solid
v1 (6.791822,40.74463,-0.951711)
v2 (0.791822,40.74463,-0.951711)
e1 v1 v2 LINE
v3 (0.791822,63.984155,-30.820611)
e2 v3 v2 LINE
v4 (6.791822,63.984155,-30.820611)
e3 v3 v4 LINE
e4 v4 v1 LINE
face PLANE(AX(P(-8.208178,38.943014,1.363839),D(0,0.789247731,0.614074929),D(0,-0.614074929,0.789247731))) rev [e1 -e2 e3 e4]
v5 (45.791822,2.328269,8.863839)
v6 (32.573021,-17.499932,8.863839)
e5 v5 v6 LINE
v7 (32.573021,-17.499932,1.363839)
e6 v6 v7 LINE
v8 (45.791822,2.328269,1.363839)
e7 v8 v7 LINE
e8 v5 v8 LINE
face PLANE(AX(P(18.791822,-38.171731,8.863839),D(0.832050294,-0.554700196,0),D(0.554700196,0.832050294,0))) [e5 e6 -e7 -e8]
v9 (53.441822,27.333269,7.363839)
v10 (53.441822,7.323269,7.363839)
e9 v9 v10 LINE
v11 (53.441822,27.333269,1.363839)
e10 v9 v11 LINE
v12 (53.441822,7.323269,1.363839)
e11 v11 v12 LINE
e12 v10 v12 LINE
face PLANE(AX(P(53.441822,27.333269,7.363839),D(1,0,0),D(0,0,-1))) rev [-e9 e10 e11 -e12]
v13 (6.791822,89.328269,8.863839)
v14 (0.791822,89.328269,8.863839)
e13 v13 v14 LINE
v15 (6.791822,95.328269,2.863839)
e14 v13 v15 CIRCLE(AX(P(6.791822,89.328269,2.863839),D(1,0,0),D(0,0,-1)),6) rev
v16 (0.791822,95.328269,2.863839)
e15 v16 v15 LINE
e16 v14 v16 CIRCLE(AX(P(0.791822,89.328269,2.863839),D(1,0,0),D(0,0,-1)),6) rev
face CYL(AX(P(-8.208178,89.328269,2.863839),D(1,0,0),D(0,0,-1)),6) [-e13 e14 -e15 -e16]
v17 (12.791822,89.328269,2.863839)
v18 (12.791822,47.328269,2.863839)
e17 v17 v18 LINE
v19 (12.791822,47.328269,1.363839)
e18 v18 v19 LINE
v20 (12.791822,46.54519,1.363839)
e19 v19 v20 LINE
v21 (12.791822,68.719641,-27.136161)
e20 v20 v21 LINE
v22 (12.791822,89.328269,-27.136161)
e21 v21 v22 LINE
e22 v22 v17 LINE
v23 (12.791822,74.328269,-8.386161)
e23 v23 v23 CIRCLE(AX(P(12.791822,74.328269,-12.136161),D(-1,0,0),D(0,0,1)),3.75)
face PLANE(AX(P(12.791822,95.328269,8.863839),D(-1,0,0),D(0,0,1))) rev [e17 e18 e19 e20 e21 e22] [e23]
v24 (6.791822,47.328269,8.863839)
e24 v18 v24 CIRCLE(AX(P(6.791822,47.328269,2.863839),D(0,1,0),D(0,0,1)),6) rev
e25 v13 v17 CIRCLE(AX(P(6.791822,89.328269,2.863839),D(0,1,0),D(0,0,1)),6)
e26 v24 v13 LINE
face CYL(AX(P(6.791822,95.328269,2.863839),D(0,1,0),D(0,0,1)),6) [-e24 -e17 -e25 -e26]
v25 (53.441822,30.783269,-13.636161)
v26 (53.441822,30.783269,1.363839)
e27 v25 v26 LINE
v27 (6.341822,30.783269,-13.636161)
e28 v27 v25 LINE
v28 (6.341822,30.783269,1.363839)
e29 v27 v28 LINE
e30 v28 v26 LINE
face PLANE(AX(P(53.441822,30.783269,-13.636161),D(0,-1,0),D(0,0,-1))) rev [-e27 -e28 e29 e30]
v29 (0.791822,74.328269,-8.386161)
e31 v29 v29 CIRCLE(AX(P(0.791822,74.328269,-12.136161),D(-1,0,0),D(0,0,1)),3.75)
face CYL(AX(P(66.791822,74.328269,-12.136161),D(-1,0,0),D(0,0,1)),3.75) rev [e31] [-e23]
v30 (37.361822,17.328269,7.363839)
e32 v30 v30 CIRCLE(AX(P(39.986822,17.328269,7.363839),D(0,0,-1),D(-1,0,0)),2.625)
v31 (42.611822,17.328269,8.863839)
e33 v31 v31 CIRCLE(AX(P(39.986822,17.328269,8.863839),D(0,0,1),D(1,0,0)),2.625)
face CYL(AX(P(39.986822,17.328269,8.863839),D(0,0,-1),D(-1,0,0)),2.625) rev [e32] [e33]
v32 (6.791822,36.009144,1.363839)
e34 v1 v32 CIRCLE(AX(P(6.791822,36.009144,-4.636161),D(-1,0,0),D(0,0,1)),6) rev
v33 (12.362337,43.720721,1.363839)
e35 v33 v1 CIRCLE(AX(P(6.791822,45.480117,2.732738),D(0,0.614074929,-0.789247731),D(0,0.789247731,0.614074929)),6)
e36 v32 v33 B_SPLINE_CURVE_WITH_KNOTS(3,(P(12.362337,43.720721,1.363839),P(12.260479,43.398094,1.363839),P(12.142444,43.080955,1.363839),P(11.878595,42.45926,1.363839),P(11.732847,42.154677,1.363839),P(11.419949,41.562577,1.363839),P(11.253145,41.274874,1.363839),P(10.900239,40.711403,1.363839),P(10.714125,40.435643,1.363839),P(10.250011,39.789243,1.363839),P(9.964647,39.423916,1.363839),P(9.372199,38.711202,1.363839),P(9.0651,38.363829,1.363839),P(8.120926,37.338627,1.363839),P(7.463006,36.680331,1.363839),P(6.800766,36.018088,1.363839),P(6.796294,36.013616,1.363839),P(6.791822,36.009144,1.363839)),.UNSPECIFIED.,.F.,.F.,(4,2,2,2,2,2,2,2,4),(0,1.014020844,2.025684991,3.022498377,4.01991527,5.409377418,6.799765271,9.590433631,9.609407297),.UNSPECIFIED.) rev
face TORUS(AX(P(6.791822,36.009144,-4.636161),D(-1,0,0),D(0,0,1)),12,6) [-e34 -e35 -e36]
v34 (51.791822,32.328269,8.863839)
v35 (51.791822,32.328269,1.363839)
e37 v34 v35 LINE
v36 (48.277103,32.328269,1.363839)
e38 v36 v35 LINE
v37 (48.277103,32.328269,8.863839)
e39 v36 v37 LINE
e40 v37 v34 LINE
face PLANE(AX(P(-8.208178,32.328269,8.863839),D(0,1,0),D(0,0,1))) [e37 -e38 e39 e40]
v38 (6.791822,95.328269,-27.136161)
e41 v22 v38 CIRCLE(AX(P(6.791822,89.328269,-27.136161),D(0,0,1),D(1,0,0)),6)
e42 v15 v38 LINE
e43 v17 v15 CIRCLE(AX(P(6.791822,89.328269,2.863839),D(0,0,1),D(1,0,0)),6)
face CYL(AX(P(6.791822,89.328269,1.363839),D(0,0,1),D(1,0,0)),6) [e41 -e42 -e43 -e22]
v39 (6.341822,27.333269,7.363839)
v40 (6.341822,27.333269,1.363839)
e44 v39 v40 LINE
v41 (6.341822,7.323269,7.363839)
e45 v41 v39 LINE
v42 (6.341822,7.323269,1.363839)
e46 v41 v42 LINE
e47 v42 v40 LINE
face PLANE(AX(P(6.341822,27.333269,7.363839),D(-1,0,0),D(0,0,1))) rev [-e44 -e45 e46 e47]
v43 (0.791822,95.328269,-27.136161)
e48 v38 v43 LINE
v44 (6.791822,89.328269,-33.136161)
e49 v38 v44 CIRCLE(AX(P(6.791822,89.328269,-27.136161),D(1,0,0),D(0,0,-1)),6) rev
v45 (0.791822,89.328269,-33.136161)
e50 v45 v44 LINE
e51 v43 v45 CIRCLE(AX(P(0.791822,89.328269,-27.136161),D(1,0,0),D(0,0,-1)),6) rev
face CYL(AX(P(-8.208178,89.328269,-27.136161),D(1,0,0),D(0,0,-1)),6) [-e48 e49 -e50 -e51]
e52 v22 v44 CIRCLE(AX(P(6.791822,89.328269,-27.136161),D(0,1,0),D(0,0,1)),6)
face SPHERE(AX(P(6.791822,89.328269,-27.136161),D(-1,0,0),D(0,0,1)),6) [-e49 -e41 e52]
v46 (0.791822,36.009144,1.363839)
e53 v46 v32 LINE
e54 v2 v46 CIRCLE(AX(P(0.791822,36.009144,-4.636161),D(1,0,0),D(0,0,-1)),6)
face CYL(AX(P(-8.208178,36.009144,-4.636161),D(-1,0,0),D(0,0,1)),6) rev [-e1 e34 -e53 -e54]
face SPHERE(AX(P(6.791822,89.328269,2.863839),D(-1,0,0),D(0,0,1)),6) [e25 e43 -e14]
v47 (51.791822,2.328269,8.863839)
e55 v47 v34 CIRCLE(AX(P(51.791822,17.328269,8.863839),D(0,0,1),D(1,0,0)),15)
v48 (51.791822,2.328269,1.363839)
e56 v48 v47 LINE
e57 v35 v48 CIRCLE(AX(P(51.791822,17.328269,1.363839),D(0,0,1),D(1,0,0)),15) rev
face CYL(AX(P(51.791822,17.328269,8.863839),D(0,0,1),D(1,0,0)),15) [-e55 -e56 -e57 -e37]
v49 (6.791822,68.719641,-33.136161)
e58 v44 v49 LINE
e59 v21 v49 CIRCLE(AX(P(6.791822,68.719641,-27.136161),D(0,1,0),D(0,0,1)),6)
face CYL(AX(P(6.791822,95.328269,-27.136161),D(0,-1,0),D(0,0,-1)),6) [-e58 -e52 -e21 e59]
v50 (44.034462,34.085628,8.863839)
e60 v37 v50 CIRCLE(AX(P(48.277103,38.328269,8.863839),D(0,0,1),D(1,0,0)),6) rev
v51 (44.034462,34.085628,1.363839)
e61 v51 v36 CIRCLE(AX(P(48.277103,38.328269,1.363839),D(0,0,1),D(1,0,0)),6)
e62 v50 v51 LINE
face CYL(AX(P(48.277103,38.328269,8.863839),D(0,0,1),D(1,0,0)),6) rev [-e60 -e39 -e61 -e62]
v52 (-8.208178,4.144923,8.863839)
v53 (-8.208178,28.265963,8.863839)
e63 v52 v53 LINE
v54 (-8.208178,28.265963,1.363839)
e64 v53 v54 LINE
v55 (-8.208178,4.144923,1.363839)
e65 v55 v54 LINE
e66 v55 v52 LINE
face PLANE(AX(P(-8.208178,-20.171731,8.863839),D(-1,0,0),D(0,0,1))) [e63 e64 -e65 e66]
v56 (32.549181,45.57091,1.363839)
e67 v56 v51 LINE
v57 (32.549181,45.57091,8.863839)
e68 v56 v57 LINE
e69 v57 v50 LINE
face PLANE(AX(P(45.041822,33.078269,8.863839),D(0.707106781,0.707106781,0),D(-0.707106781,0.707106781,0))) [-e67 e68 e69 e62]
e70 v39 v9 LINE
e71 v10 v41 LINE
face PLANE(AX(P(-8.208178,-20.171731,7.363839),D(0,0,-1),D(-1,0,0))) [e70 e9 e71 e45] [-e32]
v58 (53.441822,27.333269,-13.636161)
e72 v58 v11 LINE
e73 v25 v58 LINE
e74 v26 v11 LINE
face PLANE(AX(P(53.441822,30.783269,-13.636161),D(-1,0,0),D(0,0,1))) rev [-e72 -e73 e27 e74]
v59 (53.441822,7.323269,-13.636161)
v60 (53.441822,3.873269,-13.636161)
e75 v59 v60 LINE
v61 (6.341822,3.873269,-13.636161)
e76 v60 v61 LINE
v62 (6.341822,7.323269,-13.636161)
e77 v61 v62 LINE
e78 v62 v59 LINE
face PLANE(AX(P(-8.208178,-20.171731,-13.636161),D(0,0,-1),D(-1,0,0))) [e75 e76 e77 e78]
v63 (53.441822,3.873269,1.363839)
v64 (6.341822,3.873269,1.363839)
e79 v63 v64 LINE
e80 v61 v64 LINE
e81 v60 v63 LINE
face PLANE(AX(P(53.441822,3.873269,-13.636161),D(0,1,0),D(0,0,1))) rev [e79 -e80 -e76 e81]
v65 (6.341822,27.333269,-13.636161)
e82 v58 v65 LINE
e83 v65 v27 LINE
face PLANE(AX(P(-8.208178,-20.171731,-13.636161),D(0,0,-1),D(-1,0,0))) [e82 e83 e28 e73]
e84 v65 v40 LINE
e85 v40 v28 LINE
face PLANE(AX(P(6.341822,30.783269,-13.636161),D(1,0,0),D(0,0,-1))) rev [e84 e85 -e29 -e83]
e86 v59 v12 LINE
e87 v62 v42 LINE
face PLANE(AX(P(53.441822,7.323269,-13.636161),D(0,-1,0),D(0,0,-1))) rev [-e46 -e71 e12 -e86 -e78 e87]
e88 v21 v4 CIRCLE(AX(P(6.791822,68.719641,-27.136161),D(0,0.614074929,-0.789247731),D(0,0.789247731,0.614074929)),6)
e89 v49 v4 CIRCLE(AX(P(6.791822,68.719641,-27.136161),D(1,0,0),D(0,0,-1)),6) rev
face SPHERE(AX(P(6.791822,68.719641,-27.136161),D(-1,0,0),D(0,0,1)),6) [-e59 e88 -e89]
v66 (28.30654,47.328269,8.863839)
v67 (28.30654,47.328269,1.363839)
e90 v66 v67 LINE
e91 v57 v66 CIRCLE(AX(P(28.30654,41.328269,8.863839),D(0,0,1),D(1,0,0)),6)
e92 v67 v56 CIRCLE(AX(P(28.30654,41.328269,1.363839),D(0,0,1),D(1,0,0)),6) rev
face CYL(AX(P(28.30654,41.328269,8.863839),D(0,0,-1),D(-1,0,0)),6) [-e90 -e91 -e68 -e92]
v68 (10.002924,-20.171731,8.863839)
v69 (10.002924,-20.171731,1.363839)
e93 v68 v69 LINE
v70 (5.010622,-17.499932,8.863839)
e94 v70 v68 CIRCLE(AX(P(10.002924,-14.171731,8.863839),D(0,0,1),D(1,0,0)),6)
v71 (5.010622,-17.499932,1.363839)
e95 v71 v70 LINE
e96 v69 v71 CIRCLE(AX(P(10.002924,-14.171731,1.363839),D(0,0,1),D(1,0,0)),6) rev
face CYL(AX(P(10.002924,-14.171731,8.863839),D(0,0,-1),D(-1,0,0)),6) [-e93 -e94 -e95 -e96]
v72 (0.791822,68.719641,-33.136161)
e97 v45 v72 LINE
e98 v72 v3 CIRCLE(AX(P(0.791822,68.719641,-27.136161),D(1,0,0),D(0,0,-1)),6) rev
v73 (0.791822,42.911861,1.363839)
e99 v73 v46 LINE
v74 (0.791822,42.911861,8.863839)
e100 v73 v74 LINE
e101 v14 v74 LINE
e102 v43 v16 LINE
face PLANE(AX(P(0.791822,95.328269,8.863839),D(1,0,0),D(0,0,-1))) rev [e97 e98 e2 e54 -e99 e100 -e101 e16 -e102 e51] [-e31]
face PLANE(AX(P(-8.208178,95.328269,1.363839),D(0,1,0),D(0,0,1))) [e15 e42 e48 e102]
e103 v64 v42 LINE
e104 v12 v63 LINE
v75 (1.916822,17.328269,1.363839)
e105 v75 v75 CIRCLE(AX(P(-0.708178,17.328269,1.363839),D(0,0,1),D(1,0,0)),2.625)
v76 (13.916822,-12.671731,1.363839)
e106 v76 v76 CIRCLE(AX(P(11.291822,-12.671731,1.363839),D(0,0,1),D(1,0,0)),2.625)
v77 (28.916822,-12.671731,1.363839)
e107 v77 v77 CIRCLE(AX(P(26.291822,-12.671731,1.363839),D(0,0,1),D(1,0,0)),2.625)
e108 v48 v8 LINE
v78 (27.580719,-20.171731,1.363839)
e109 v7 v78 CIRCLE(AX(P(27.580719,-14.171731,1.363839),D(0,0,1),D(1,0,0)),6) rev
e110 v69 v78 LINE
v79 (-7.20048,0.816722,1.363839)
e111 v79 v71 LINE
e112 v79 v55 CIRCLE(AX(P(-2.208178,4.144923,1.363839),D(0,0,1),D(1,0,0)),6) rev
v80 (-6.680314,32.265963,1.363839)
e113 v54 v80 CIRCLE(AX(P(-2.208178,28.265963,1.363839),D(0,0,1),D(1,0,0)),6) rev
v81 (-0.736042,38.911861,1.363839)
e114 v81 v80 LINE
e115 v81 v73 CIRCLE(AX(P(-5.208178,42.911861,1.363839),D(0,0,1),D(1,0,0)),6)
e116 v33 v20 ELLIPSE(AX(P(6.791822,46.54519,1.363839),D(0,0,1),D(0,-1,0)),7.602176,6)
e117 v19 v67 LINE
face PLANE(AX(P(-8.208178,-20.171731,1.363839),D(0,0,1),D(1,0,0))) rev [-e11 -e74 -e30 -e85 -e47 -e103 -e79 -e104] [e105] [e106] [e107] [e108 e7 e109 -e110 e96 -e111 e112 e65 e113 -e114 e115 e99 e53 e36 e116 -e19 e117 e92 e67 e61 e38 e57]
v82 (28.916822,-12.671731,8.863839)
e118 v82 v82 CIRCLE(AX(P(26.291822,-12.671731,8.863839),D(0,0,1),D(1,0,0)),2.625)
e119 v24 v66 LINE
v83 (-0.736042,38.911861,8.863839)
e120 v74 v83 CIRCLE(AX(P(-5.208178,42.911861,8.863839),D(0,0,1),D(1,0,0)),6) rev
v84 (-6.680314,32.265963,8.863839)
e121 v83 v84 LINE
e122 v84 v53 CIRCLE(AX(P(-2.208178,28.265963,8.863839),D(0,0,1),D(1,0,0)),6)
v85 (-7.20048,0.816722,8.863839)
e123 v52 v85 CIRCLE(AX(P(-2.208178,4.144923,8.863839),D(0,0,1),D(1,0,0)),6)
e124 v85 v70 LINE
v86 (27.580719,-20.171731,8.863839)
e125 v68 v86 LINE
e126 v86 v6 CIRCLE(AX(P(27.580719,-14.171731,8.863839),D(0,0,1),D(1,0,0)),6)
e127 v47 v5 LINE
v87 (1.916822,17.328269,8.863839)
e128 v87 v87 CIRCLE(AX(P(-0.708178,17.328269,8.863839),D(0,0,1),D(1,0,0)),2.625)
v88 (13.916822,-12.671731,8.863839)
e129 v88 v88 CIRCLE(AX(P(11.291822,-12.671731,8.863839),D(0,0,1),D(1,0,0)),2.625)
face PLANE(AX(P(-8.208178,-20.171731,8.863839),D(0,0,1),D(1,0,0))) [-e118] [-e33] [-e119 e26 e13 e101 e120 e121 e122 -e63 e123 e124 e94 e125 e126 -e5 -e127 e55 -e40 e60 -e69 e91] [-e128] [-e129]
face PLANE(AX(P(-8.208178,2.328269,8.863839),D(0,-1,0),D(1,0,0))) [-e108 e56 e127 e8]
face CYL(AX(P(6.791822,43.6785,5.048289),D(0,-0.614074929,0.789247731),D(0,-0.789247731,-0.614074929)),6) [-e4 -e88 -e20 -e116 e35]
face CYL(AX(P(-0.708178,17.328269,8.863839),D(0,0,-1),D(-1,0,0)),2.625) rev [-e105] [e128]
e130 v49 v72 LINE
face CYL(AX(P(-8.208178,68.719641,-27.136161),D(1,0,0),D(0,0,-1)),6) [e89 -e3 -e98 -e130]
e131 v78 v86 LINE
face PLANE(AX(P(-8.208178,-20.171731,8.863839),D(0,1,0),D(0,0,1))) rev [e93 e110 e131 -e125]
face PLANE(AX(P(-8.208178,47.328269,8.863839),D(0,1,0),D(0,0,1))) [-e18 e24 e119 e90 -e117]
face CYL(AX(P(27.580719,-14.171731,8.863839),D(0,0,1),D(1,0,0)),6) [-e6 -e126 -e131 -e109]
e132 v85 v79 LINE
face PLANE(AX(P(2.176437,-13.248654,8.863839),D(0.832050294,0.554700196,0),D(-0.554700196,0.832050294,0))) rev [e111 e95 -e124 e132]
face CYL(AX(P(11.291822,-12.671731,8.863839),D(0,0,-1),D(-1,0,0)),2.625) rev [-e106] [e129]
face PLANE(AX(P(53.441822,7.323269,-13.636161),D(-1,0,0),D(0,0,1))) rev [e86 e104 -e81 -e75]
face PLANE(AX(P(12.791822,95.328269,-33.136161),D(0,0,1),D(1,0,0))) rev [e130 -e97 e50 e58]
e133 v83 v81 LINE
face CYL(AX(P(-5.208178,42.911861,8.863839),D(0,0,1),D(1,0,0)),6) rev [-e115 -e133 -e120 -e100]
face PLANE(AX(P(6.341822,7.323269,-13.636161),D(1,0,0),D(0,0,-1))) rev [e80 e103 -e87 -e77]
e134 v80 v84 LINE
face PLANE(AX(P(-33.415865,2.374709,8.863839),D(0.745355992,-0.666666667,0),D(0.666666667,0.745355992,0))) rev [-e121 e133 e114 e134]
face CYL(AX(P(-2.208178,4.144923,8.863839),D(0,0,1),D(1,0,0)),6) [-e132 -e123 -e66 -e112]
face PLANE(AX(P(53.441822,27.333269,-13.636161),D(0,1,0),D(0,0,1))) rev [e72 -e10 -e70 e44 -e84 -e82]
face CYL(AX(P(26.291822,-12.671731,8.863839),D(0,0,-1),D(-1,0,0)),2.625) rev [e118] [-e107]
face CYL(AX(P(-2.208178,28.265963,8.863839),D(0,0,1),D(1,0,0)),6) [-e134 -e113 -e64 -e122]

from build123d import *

# Parameters (mm, degrees)
SKETCH2_R           = 1.7500000000000018
SKETCH2_R_2         = 1.7499999999999967
SKETCH2_R_3         = 1.7500000000000013
SKETCH2_R_4         = 1.7500000000000038
BOSS_EXTRUDE2_DEPTH = 5
SKETCH5_W           = 31.39999999999999
SKETCH5_H           = 2.3000000000000007
BOSS_EXTRUDE4_DEPTH = 10
CUT_EXTRUDE1_DEPTH  = 77.48529270389177
FILLET1_RADIUS      = 10
FILLET1_LENGTH      = 5
SKETCH7_W           = 31.39999999999999
SKETCH7_H           = 13.340000000000003
CUT_EXTRUDE3_DEPTH  = 4
SKETCH8_W           = 8
SKETCH8_H           = 28
BOSS_EXTRUDE5_DEPTH = 32
BOSS_EXTRUDE6_DEPTH = 8
SKETCH10_R          = 2.500000000000001
CUT_EXTRUDE4_DEPTH  = 92.61877536837086
CUT_EXTRUDE5_DEPTH  = 89.05679985100527
FILLET3_R           = 4
FILLET2_R           = 4
FILLET4_R           = 4
SCALE1_SCALE        = 1.5


with BuildPart() as part:
    # Sketch2 → Boss-Extrude2 (new body)
    with BuildSketch(Plane.XY):
        Polygon((25.999999999999996, 45), (9.999999999999998, 45), (0, 33.819660112501055), (0, 15.000000000000002), (10.000000000000002, 0), (26, 0), (36.00000000000001, 14.999999999999993), (60, 14.999999999999996), (60, 35), (36.00000000000001, 35), align=None)
        with Locations((12.999999999999998, 5.000000000000004)):
            Circle(SKETCH2_R, mode=Mode.SUBTRACT)
        with Locations((22.999999999999993, 5.000000000000004)):
            Circle(SKETCH2_R_2, mode=Mode.SUBTRACT)
        with Locations((5.000000000000001, 24.999999999999993)):
            Circle(SKETCH2_R_3, mode=Mode.SUBTRACT)
        with Locations((32.129999999999995, 24.999999999999993)):
            Circle(SKETCH2_R_4, mode=Mode.SUBTRACT)
    extrude(amount=BOSS_EXTRUDE2_DEPTH)

    # Sketch5 → Boss-Extrude4 (add)
    with BuildSketch(Plane(origin=(0, 0, 0), x_dir=(-1, 0, 0), z_dir=(0, 0, -1))):
        with Locations((-25.4, 17.179999999999993)):
            Rectangle(SKETCH5_W, SKETCH5_H)
        with Locations((-25.4, 32.82)):
            Rectangle(SKETCH5_W, SKETCH5_H)
    extrude(amount=BOSS_EXTRUDE4_DEPTH)

    # Sketch6 → Cut-Extrude1 (cut, through all)
    with BuildSketch(Plane.XY.offset(5)):
        Polygon((60, 35), (49.999999999999986, 35), (49.99999999999999, 14.999999999999993), (60, 14.999999999999993), align=None)
    extrude(amount=-CUT_EXTRUDE1_DEPTH, mode=Mode.SUBTRACT)

    # Fillet1: full round fillet: the end face becomes a half cylinder, R = half its width
    fillet1_face = Plane((50, 25, 2.5), x_dir=(0, 0, -1), z_dir=(1, 0, 0))  # on the end face: x along it, z out of the body
    fillet1_slab = fillet1_face.offset(-FILLET1_RADIUS / 2) * Box(FILLET1_LENGTH, 2 * FILLET1_RADIUS, FILLET1_RADIUS, mode=Mode.PRIVATE)  # the body's end, R deep
    fillet1_round = Plane((40, 25, 2.5), x_dir=(1, 0, 0), z_dir=(0, 0, -1)) * Cylinder(FILLET1_RADIUS, FILLET1_LENGTH, mode=Mode.PRIVATE)  # its axis R under the face
    add(fillet1_slab - fillet1_round, mode=Mode.SUBTRACT)

    # Sketch7 → Cut-Extrude3 (cut)
    with BuildSketch(Plane(origin=(0, 0, 0), x_dir=(-1, 0, 0), z_dir=(0, 0, -1))):
        with Locations((-25.4, 24.999999999999996)):
            Rectangle(SKETCH7_W, SKETCH7_H)
    extrude(amount=-CUT_EXTRUDE3_DEPTH, mode=Mode.SUBTRACT)

    # Sketch8 → Boss-Extrude5 (add)
    with BuildSketch(Plane(origin=(0, 45, 0), x_dir=(1, 0, 0), z_dir=(0, 1, 0))):
        with Locations((9.999999999999996, 9)):
            Rectangle(SKETCH8_W, SKETCH8_H)
    extrude(amount=BOSS_EXTRUDE5_DEPTH)

    # Sketch9 → Boss-Extrude6 (add)
    with BuildSketch(Plane.ZY.offset(-5.999999999999995)):
        Polygon((5.000000000000001, 45), (-23, 45), (-15.299548194431079, 39.40983005625053), (5, 39.40983005625053), align=None)
    extrude(amount=-BOSS_EXTRUDE6_DEPTH)

    # Sketch10 → Cut-Extrude4 (cut, through all)
    with BuildSketch(Plane.ZY.offset(-5.999999999999995)):
        with Locations((-9, 63)):
            Circle(SKETCH10_R)
    extrude(amount=-CUT_EXTRUDE4_DEPTH, mode=Mode.SUBTRACT)

    # Sketch11 → Cut-Extrude5 (cut, through all)
    with BuildSketch(Plane(origin=(13.999999999999995, 0, 0), x_dir=(0, 0, -1), z_dir=(1, 0, 0))):
        Polygon((0, 39.40983005625053), (23, 57.30500139086019), (23, 45), (15.299548194431079, 39.40983005625053), align=None)
    extrude(amount=-CUT_EXTRUDE5_DEPTH, mode=Mode.SUBTRACT)

    # Fillet3
    fillet3_edges = [part.edges().sort_by_distance(p)[0] for p in [
        (9.999999999999995, 77, -23),
        (9.999999999999995, 77, 5.000000000000001),
        (9.999999999999995, 39.40983005625053, 0),
        (9.999999999999995, 57.30500139086019, -23),
    ]]
    fillet(fillet3_edges, radius=FILLET3_R)

    # Fillet2
    # the kernel refuses this fillet: 4 mm, written as the material it takes off along each edge
    with BuildSketch(Plane(origin=(13.999999999999995, 40.61090749308988, -1.5437002826498933), x_dir=(-1, 1.3e-16, 1e-16), z_dir=(0, 0.6140749293375269, -0.7892477311713423))) as fillet2_piece_1_section:
        with BuildLine():
            CenterArc((FILLET2_R, FILLET2_R), FILLET2_R, 180, 90)
            Line((6.8e-16, FILLET2_R), (0, 0))
            Line((0, 0), (FILLET2_R, 0))
        make_face()
    fillet2_piece_1 = extrude(amount=25.229846914032212, mode=Mode.PRIVATE)
    fillet2_piece_1 = split(fillet2_piece_1, bisect_by=Plane(origin=(13.08677452715668, 48.37488686948177, 0), z_dir=(0, 0, -1)), keep=Keep.TOP, mode=Mode.PRIVATE)
    add(fillet2_piece_1, mode=Mode.SUBTRACT)
    with BuildSketch(Plane(origin=(13.999999999999995, 59.26091487870621, -23), x_dir=(-1, 0, 0), z_dir=(0, 1, 0))) as fillet2_piece_2:
        with BuildLine():
            CenterArc((FILLET2_R, FILLET2_R), FILLET2_R, 180, 90)
            Line((0, FILLET2_R), (0, 0))
            Line((0, 0), (FILLET2_R, 0))
        make_face()
    extrude(amount=13.73908512129379, mode=Mode.SUBTRACT)
    with BuildSketch(Plane(origin=(13.999999999999995, 77, -19), x_dir=(-1, 0, 0), z_dir=(0, 0, 1))) as fillet2_piece_3:
        with BuildLine():
            CenterArc((FILLET2_R, FILLET2_R), FILLET2_R, 180, 90)
            Line((0, FILLET2_R), (0, 0))
            Line((0, 0), (FILLET2_R, 0))
        make_face()
    extrude(amount=20, mode=Mode.SUBTRACT)
    with BuildSketch(Plane(origin=(13.999999999999995, 45, 5.000000000000001), x_dir=(-1, 0, -2.2e-16), z_dir=(0, 1, 0))) as fillet2_piece_4:
        with BuildLine():
            CenterArc((FILLET2_R, -FILLET2_R), FILLET2_R, 90.00000000000001, 89.99999999999999)
            Line((2.66e-15, -FILLET2_R), (0, 0))
            Line((0, 0), (FILLET2_R, 0))
        make_face()
    extrude(amount=28, mode=Mode.SUBTRACT)
    with BuildSketch(Plane(origin=(13.999999999999995, 73, 1.0000000000000009), x_dir=(0, 0, 1), z_dir=(0, -1, 0))) as fillet2_piece_5:
        with BuildLine():
            CenterArc((4 - FILLET2_R, FILLET2_R), FILLET2_R, 270, 90)
            Line((4 - FILLET2_R, 0), (4, 0))
            Line((4, 0), (4, FILLET2_R))
        make_face()
    revolve(axis=Axis((13.999999999999995, 73, 1.0000000000000009), (-1, 0, 0)), revolution_arc=90, mode=Mode.SUBTRACT)
    with BuildSketch(Plane(origin=(13.999999999999995, 73, -19), x_dir=(0, 0, -1), z_dir=(0, -1, 0))) as fillet2_piece_6:
        with BuildLine():
            CenterArc((4 - FILLET2_R, -FILLET2_R), FILLET2_R, 0, 90)
            Line((4 - FILLET2_R, 0), (4, 0))
            Line((4, 0), (4, -FILLET2_R))
        make_face()
    revolve(axis=Axis((13.999999999999995, 73, -19), (1, 0, 0)), revolution_arc=90, mode=Mode.SUBTRACT)
    with BuildSketch(Plane(origin=(13.999999999999995, 59.26091487870621, -19), x_dir=(0, 0, -1), z_dir=(0, 1, 0))) as fillet2_piece_7:
        with BuildLine():
            CenterArc((4 - FILLET2_R, FILLET2_R), FILLET2_R, 270, 90)
            Line((4 - FILLET2_R, 0), (4, 0))
            Line((4, 0), (4, FILLET2_R))
        make_face()
    revolve(axis=Axis((13.999999999999995, 59.26091487870621, -19), (-1, 0, 0)), revolution_arc=52.11526627923318, mode=Mode.SUBTRACT)
    with BuildSketch(Plane(origin=(13.999999999999995, 37.453916568404516, -4.000000000000001), x_dir=(0, 0.7892477311713422, 0.614074929337527), z_dir=(0, 0.614074929337527, -0.7892477311713422))) as fillet2_piece_8_section:
        with BuildLine():
            CenterArc((3.999999999999998 + FILLET2_R, -FILLET2_R), FILLET2_R, 90.00000000000004, 89.99999999999994)
            Line((3.999999999999998 + FILLET2_R, 0), (3.999999999999998, 0))
            Line((3.999999999999998, 0), (4, -FILLET2_R))
        make_face()
    fillet2_piece_8 = revolve(axis=Axis((13.999999999999995, 37.453916568404516, -4.000000000000001), (1, 0, 0)), revolution_arc=195.37400527524528, mode=Mode.PRIVATE)
    fillet2_piece_8 = split(fillet2_piece_8, bisect_by=Plane(origin=(12.442859007716585, 39.2454758765285, 0), z_dir=(0, 0, -1)), keep=Keep.TOP, mode=Mode.PRIVATE)
    fillet2_piece_8 = split(fillet2_piece_8, bisect_by=Plane(origin=(12.442859007716585, 33.97, -0.3361174942439581), z_dir=(0, 1, 0)), keep=Keep.TOP, mode=Mode.PRIVATE)
    add(fillet2_piece_8, mode=Mode.SUBTRACT)

    # Fillet4
    fillet4_edges = [part.edges().sort_by_distance(p)[0] for p in [
        (5.999999999999995, 40.52786404500041, 2.500000000000001),
        (26, 0, 2.5),
        (10.000000000000002, 0, 2.5),
        (0, 15.000000000000002, 2.5),
        (0, 33.819660112501055, 2.5),
        (25.999999999999996, 45, 2.5),
        (36.00000000000001, 35, 2.5),
    ]]
    fillet(fillet4_edges, radius=FILLET4_R)


with BuildPart() as part_1:
    # Scale1: scaled about (16.416357699, 40.343462641, -2.727678487)
    add(part.part.scale(SCALE1_SCALE).moved(Location((-8.2081788495, -20.1717313205, 1.3638392435))))


solid = part_1.part
